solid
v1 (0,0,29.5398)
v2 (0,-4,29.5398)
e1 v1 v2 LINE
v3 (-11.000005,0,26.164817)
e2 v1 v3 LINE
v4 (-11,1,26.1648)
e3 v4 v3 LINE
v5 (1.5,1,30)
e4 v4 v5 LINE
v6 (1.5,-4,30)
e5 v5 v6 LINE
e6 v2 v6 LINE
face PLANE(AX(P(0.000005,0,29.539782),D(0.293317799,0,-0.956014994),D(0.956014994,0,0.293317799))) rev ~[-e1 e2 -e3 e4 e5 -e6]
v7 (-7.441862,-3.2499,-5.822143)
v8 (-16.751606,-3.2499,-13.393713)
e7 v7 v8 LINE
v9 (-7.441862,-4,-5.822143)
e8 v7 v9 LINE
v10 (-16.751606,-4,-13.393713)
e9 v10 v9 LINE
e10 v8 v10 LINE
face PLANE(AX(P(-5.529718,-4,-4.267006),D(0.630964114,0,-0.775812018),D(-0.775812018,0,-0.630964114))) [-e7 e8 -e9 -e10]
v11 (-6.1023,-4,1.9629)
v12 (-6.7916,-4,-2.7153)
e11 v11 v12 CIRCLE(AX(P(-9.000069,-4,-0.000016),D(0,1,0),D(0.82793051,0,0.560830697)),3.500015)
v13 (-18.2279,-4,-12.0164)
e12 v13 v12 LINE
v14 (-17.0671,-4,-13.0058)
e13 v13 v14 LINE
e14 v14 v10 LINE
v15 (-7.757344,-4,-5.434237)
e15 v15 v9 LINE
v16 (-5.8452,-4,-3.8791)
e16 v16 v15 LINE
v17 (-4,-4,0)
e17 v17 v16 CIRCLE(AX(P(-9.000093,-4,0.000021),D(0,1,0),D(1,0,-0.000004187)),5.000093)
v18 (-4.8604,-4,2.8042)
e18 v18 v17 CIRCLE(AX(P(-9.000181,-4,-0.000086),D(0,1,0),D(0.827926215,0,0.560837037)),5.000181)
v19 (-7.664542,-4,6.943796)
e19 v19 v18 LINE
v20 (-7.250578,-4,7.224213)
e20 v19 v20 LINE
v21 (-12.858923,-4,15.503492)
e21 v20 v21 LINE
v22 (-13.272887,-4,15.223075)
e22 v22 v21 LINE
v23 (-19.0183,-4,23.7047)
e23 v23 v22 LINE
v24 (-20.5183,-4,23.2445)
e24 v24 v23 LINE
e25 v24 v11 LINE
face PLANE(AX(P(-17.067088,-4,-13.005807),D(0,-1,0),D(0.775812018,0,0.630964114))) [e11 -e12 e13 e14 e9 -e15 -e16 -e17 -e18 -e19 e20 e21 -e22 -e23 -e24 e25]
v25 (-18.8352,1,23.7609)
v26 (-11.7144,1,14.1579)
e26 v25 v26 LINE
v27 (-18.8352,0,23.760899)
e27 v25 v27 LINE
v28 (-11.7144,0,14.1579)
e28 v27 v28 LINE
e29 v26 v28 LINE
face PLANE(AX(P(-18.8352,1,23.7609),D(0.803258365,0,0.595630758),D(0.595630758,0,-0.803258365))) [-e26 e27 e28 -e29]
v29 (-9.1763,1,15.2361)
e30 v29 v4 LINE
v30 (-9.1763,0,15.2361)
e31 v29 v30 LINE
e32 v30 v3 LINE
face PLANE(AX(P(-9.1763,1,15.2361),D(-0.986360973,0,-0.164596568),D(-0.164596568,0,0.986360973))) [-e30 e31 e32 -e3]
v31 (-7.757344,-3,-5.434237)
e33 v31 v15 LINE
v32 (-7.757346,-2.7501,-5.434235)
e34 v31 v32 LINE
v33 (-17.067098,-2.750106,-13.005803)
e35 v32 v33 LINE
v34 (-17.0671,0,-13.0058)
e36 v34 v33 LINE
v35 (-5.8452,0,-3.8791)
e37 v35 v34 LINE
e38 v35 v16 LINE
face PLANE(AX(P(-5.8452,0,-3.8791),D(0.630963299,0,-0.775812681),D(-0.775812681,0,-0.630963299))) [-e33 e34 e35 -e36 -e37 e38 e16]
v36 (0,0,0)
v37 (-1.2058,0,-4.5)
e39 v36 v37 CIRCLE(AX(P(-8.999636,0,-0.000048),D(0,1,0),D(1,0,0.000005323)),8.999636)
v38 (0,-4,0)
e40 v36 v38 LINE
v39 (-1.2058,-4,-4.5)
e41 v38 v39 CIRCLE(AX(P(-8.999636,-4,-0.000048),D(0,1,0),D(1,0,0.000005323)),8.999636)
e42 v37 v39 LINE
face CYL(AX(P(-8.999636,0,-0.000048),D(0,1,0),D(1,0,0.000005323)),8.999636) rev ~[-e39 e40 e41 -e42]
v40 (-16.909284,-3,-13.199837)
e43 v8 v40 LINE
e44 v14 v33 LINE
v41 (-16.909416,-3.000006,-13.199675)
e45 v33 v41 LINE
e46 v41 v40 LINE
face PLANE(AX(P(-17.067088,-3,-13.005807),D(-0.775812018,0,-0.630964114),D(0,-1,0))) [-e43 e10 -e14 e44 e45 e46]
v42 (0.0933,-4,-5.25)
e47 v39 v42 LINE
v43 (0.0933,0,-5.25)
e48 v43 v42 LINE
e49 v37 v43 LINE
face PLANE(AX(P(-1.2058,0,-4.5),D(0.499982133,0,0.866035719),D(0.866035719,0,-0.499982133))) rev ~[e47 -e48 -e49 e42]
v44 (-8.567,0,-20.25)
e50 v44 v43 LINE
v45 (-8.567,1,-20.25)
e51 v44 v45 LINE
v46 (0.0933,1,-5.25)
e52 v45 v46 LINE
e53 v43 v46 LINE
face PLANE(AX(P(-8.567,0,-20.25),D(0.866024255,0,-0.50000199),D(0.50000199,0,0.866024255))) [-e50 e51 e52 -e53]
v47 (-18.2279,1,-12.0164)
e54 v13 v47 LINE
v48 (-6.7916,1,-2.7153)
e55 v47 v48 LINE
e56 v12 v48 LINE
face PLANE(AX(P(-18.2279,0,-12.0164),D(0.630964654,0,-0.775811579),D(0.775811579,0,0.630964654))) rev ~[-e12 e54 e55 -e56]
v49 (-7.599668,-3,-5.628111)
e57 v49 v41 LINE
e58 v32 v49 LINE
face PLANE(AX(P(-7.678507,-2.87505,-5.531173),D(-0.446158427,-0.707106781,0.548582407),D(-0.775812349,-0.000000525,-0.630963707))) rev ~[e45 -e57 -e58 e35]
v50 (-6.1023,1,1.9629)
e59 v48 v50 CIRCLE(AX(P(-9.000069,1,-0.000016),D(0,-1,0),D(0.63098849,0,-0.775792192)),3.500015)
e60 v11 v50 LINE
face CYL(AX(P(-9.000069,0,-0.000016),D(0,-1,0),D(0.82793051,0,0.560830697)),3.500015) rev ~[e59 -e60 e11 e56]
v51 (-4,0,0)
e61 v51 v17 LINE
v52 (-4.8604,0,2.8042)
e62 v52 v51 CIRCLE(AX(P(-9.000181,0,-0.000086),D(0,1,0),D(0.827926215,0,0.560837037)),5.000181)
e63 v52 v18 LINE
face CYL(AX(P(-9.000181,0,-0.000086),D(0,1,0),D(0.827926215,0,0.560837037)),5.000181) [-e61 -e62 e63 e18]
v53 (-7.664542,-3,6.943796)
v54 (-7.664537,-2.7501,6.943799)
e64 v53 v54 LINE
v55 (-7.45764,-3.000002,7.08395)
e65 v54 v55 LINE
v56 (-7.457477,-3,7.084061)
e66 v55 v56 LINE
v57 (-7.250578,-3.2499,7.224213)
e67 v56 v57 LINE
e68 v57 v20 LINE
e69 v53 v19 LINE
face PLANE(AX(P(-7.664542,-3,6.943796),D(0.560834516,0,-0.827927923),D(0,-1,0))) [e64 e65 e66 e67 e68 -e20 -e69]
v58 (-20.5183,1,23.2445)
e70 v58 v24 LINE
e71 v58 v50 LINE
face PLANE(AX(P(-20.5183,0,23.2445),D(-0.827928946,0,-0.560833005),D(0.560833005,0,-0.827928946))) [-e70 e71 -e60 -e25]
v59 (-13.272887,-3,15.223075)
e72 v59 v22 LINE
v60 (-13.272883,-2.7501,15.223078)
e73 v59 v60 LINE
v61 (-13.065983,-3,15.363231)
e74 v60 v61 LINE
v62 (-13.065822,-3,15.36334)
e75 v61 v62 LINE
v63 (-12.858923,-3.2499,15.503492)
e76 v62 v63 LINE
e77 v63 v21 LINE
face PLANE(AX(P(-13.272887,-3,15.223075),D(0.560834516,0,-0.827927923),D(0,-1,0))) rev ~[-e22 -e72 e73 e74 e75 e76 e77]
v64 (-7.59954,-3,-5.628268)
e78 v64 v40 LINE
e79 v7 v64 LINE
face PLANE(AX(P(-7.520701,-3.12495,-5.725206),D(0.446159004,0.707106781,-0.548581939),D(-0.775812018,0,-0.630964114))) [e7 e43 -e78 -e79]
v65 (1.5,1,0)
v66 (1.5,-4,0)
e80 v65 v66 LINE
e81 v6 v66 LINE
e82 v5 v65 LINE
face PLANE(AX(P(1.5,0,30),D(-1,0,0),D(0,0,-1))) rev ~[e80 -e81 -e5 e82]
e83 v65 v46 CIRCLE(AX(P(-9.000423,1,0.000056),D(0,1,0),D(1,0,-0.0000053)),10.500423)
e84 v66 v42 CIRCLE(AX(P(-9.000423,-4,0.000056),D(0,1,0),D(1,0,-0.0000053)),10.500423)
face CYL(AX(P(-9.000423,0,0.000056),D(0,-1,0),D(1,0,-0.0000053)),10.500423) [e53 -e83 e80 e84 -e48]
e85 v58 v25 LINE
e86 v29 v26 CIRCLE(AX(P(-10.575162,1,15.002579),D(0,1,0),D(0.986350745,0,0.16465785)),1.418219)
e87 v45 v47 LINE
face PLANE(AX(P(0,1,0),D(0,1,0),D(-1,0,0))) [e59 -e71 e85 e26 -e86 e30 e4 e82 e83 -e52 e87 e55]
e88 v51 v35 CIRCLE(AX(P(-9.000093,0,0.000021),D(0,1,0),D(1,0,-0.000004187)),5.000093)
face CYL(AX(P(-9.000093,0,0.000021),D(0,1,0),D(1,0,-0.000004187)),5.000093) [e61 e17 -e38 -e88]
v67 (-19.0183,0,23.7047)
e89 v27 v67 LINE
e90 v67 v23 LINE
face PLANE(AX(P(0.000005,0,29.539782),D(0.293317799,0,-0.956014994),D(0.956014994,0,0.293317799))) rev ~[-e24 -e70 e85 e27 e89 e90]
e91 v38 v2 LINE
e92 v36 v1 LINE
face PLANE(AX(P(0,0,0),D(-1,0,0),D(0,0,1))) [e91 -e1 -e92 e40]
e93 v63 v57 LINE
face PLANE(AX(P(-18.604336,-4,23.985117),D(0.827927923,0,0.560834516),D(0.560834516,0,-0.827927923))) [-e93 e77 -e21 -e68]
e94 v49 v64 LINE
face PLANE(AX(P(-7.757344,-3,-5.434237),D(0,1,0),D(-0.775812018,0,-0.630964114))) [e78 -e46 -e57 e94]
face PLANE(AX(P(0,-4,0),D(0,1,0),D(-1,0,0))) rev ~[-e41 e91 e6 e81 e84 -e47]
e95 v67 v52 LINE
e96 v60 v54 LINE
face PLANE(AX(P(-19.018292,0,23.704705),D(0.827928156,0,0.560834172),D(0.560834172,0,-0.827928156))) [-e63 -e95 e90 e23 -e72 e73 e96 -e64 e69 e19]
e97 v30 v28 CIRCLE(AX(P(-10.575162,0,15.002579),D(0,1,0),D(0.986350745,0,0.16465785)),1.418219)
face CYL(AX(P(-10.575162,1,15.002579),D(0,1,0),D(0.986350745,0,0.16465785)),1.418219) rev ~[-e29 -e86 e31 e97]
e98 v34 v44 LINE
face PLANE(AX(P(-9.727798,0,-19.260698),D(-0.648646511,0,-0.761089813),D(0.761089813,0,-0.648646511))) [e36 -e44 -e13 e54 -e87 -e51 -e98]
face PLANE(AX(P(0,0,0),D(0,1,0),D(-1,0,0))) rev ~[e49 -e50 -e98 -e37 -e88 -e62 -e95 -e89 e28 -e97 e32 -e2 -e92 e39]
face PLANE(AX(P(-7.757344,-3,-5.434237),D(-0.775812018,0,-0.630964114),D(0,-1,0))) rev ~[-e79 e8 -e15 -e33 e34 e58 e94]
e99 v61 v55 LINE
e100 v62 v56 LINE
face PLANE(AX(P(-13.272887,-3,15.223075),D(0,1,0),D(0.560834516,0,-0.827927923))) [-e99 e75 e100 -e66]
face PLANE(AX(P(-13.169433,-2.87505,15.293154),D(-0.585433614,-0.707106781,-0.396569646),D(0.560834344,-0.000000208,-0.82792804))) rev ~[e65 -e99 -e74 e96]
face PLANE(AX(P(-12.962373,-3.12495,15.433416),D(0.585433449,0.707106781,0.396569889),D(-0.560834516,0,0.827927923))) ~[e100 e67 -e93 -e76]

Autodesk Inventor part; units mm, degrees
ref_plane "YZ Plane" through (0, 0, 0) normal (1, 0, 0) x (0, 1, 0)
ref_plane "XZ Plane" through (0, 0, 0) normal (0, 1, 0) x (-1, 0, 0)
ref_plane "XY Plane" through (0, 0, 0) normal (0, 0, 1) x (1, 0, 0)
sketch "Sketch1" plane through (0, 0, 0) normal (0, 1, 0) x (-1, 0, 0)
  line L0 (0, 0) -> (0, 38)
  arc A0 (23.7631, 30.7092) -> (0, 38) centre (13, 38) ccw
  line L1 (0, 38) -> (13, 38)
  arc A1 (0, 0) -> (1.2058, -4.5) centre (9, 0) ccw
  line L2 (0, 0) -> (9, 0)
  line L3 (0, 0) -> (4, 0)
  arc A2 (4, 0) -> (5.8452, -3.8791) centre (9, 0) ccw
  arc A3 (4.8604, 2.8042) -> (4, 0) centre (9, 0) ccw
  line L4 (23.7631, 30.7092) -> (4.8604, 2.8042)
  line L5 (1.2058, -4.5) -> (12.7058, -24.4186)
  line L6 (12.7058, -24.4186) -> (17.9019, -21.4186)
  arc A4 (12.7058, -24.4186) -> (21.6877, -16.7637) centre (17.9019, -21.4186) ccw
  line L7 (5.8452, -3.8791) -> (21.6877, -16.7637)
  line L8 (20.5183, 23.2445) -> (6.1023, 1.9629)
  line L9 (18.2279, -12.0164) -> (6.7916, -2.7153)
  arc A5 (6.1023, 1.9629) -> (6.7916, -2.7153) centre (9, 0) ccw
  line L10 (-1.5, 30) -> (-1.5, 0)
  line L11 (8.567, -20.25) -> (-0.0933, -5.25)
  arc A6 (-1.5, 0) -> (-0.0933, -5.25) centre (9, 0) ccw
  line L12 (18.2279, -12.0164) -> (8.567, -20.25)
  line L13 (20.5183, 23.2445) -> (-1.5, 30)
  line L14 (4.8604, 2.8042) -> (19.0183, 23.7047)
  line L15 (0, 29.5398) -> (0, 0)
  line L16 (5.8452, -3.8791) -> (17.0671, -13.0058)
  line L17 (9.7278, -19.2607) -> (1.2058, -4.5)
  line L18 (1.2058, -4.5) -> (-0.0933, -5.25)
  dimension "d0" = 38
  dimension "d1" = 13
  dimension "d2" = 9
  dimension "d3" = 5
  dimension "d4" = 30
  dimension "d5" = 23
  dimension "d6" = 6
  dimension "d7" = 4
  dimension "d13" = 1.5
  dimension "d14" = 1.5
  dimension "d15" = 79.561
  dimension "d16" = 79.561
  dimension "d17" = 72.943
  dimension "d18" = 72.943
  dimension "d19" = 30
  dimension "d20" = 15
extrude "Extrusion1" add sketch "Sketch1" along normal blind 1 contours A1 L18 A6 L10 L13 L0 | L2 A2 L7 L12 L5 A1 | L0 L13 L4 A3 L2 | L5 L12 L11 L18 | A3 L4 L13 L8 A5 L2 | L2 A5 L9 L12 L7 A2
extrude "Extrusion2" add sketch "Sketch1" against normal blind 4 contours A1 L18 A6 L10 L13 L0 | A3 L4 L13 L8 A5 L2 | L2 A5 L9 L12 L7 A2
sketch "Sketch2" plane through (-5.8452, -4, -3.8791) normal (0.6309641, 0, -0.775812) x (-0.775812, 0, -0.6309641)
  line L0 (14.4647, 0) -> (0, 0) projected
  line L1 (14.4647, 0) -> (2.4647, 0)
  line L2 (2.4647, 1) -> (14.4647, 1)
  line L3 (14.4647, 4) -> (14.4647, 0) projected
  line L4 (14.4647, 0) -> (14.4647, 1)
  line L5 (2.4647, 1) -> (2.4647, 0)
  point P0 (-6.9823, 4)
  dimension "d28" = 12
extrude "Extrusion4" add sketch "Sketch2" along normal blind 0.5
sketch "Sketch3" plane through (-19.0183, -4, 23.7047) normal (0.8279279, 0, 0.5608345) x (0.5608345, 0, -0.8279279)
  line L0 (25.2444, 0) -> (0, 0) projected
  line L1 (20.2444, 0) -> (10.2444, 0)
  line L2 (10.2444, 1) -> (20.2444, 1)
  line L3 (20.2444, 1) -> (20.2444, 0)
  line L4 (10.2444, 1) -> (10.2444, 0)
  point P0 (30.2919, 4)
  dimension "d31" = 10
  dimension "d32" = 5
  dimension "d33" = 1
extrude "Extrusion5" add sketch "Sketch3" along normal blind 0.5
chamfer "Chamfer1" distance 0.25 angle 45 4 edges at (-12.4122, -3, -9.22) (-10.4687, -3, 11.0835) (-10.0547, -3, 11.3639) (-12.0967, -3, -9.6079)
sketch "Sketch4" plane through (0, 1, 0) normal (0, 1, 0) x (1, 0, 0)
  line L0 (-20.5183, -23.2445) -> (1.5, -30) projected
  line L1 (-18.8352, -23.7609) -> (-11.7144, -14.1579)
  arc A0 (-9.1763, -15.2361) -> (-11.7144, -14.1579) centre (-10.5752, -15.0026) ccw
  arc A1 (1.5, 0) -> (0.0933, 5.25) centre (-9, 0) ccw projected
  line L2 (0.0933, 5.25) -> (-10.567, 18.5455)
  line L3 (-8.567, 20.25) -> (-18.2279, 12.0164) projected
  line L4 (-10.567, 18.5455) -> (-8.567, 20.25)
  line L5 (-8.567, 20.25) -> (0.0933, 5.25)
  line L6 (-8.567, 20.25) -> (-10.567, 18.5455)
  line L7 (-9.1763, -15.2361) -> (-11, -26.1648)
  point P0 (0, 0)
  dimension "d42" = 2
extrude "Extrusion6" cut sketch "Sketch4" against normal blind 10 contours L1 A0 L7 L0
equation "\"d0\" = d8"
equation "\"d3\" = d2 - d7"
equation "\"d4\" = d9"
equation "\"d5\" = d10"
equation "\"d6\" = d11"
equation "\"d7\" = d12"
equation "\"d15\" = d16"
equation "\"d17\" = d18"
equation "\"d8\" = 38"
equation "\"d9\" = 30deg"
equation "\"d10\" = 23"
equation "\"d11\" = 6"
equation "\"d12\" = 4"
properties part number "flexible_leg_CS-3_V5_Armor"
